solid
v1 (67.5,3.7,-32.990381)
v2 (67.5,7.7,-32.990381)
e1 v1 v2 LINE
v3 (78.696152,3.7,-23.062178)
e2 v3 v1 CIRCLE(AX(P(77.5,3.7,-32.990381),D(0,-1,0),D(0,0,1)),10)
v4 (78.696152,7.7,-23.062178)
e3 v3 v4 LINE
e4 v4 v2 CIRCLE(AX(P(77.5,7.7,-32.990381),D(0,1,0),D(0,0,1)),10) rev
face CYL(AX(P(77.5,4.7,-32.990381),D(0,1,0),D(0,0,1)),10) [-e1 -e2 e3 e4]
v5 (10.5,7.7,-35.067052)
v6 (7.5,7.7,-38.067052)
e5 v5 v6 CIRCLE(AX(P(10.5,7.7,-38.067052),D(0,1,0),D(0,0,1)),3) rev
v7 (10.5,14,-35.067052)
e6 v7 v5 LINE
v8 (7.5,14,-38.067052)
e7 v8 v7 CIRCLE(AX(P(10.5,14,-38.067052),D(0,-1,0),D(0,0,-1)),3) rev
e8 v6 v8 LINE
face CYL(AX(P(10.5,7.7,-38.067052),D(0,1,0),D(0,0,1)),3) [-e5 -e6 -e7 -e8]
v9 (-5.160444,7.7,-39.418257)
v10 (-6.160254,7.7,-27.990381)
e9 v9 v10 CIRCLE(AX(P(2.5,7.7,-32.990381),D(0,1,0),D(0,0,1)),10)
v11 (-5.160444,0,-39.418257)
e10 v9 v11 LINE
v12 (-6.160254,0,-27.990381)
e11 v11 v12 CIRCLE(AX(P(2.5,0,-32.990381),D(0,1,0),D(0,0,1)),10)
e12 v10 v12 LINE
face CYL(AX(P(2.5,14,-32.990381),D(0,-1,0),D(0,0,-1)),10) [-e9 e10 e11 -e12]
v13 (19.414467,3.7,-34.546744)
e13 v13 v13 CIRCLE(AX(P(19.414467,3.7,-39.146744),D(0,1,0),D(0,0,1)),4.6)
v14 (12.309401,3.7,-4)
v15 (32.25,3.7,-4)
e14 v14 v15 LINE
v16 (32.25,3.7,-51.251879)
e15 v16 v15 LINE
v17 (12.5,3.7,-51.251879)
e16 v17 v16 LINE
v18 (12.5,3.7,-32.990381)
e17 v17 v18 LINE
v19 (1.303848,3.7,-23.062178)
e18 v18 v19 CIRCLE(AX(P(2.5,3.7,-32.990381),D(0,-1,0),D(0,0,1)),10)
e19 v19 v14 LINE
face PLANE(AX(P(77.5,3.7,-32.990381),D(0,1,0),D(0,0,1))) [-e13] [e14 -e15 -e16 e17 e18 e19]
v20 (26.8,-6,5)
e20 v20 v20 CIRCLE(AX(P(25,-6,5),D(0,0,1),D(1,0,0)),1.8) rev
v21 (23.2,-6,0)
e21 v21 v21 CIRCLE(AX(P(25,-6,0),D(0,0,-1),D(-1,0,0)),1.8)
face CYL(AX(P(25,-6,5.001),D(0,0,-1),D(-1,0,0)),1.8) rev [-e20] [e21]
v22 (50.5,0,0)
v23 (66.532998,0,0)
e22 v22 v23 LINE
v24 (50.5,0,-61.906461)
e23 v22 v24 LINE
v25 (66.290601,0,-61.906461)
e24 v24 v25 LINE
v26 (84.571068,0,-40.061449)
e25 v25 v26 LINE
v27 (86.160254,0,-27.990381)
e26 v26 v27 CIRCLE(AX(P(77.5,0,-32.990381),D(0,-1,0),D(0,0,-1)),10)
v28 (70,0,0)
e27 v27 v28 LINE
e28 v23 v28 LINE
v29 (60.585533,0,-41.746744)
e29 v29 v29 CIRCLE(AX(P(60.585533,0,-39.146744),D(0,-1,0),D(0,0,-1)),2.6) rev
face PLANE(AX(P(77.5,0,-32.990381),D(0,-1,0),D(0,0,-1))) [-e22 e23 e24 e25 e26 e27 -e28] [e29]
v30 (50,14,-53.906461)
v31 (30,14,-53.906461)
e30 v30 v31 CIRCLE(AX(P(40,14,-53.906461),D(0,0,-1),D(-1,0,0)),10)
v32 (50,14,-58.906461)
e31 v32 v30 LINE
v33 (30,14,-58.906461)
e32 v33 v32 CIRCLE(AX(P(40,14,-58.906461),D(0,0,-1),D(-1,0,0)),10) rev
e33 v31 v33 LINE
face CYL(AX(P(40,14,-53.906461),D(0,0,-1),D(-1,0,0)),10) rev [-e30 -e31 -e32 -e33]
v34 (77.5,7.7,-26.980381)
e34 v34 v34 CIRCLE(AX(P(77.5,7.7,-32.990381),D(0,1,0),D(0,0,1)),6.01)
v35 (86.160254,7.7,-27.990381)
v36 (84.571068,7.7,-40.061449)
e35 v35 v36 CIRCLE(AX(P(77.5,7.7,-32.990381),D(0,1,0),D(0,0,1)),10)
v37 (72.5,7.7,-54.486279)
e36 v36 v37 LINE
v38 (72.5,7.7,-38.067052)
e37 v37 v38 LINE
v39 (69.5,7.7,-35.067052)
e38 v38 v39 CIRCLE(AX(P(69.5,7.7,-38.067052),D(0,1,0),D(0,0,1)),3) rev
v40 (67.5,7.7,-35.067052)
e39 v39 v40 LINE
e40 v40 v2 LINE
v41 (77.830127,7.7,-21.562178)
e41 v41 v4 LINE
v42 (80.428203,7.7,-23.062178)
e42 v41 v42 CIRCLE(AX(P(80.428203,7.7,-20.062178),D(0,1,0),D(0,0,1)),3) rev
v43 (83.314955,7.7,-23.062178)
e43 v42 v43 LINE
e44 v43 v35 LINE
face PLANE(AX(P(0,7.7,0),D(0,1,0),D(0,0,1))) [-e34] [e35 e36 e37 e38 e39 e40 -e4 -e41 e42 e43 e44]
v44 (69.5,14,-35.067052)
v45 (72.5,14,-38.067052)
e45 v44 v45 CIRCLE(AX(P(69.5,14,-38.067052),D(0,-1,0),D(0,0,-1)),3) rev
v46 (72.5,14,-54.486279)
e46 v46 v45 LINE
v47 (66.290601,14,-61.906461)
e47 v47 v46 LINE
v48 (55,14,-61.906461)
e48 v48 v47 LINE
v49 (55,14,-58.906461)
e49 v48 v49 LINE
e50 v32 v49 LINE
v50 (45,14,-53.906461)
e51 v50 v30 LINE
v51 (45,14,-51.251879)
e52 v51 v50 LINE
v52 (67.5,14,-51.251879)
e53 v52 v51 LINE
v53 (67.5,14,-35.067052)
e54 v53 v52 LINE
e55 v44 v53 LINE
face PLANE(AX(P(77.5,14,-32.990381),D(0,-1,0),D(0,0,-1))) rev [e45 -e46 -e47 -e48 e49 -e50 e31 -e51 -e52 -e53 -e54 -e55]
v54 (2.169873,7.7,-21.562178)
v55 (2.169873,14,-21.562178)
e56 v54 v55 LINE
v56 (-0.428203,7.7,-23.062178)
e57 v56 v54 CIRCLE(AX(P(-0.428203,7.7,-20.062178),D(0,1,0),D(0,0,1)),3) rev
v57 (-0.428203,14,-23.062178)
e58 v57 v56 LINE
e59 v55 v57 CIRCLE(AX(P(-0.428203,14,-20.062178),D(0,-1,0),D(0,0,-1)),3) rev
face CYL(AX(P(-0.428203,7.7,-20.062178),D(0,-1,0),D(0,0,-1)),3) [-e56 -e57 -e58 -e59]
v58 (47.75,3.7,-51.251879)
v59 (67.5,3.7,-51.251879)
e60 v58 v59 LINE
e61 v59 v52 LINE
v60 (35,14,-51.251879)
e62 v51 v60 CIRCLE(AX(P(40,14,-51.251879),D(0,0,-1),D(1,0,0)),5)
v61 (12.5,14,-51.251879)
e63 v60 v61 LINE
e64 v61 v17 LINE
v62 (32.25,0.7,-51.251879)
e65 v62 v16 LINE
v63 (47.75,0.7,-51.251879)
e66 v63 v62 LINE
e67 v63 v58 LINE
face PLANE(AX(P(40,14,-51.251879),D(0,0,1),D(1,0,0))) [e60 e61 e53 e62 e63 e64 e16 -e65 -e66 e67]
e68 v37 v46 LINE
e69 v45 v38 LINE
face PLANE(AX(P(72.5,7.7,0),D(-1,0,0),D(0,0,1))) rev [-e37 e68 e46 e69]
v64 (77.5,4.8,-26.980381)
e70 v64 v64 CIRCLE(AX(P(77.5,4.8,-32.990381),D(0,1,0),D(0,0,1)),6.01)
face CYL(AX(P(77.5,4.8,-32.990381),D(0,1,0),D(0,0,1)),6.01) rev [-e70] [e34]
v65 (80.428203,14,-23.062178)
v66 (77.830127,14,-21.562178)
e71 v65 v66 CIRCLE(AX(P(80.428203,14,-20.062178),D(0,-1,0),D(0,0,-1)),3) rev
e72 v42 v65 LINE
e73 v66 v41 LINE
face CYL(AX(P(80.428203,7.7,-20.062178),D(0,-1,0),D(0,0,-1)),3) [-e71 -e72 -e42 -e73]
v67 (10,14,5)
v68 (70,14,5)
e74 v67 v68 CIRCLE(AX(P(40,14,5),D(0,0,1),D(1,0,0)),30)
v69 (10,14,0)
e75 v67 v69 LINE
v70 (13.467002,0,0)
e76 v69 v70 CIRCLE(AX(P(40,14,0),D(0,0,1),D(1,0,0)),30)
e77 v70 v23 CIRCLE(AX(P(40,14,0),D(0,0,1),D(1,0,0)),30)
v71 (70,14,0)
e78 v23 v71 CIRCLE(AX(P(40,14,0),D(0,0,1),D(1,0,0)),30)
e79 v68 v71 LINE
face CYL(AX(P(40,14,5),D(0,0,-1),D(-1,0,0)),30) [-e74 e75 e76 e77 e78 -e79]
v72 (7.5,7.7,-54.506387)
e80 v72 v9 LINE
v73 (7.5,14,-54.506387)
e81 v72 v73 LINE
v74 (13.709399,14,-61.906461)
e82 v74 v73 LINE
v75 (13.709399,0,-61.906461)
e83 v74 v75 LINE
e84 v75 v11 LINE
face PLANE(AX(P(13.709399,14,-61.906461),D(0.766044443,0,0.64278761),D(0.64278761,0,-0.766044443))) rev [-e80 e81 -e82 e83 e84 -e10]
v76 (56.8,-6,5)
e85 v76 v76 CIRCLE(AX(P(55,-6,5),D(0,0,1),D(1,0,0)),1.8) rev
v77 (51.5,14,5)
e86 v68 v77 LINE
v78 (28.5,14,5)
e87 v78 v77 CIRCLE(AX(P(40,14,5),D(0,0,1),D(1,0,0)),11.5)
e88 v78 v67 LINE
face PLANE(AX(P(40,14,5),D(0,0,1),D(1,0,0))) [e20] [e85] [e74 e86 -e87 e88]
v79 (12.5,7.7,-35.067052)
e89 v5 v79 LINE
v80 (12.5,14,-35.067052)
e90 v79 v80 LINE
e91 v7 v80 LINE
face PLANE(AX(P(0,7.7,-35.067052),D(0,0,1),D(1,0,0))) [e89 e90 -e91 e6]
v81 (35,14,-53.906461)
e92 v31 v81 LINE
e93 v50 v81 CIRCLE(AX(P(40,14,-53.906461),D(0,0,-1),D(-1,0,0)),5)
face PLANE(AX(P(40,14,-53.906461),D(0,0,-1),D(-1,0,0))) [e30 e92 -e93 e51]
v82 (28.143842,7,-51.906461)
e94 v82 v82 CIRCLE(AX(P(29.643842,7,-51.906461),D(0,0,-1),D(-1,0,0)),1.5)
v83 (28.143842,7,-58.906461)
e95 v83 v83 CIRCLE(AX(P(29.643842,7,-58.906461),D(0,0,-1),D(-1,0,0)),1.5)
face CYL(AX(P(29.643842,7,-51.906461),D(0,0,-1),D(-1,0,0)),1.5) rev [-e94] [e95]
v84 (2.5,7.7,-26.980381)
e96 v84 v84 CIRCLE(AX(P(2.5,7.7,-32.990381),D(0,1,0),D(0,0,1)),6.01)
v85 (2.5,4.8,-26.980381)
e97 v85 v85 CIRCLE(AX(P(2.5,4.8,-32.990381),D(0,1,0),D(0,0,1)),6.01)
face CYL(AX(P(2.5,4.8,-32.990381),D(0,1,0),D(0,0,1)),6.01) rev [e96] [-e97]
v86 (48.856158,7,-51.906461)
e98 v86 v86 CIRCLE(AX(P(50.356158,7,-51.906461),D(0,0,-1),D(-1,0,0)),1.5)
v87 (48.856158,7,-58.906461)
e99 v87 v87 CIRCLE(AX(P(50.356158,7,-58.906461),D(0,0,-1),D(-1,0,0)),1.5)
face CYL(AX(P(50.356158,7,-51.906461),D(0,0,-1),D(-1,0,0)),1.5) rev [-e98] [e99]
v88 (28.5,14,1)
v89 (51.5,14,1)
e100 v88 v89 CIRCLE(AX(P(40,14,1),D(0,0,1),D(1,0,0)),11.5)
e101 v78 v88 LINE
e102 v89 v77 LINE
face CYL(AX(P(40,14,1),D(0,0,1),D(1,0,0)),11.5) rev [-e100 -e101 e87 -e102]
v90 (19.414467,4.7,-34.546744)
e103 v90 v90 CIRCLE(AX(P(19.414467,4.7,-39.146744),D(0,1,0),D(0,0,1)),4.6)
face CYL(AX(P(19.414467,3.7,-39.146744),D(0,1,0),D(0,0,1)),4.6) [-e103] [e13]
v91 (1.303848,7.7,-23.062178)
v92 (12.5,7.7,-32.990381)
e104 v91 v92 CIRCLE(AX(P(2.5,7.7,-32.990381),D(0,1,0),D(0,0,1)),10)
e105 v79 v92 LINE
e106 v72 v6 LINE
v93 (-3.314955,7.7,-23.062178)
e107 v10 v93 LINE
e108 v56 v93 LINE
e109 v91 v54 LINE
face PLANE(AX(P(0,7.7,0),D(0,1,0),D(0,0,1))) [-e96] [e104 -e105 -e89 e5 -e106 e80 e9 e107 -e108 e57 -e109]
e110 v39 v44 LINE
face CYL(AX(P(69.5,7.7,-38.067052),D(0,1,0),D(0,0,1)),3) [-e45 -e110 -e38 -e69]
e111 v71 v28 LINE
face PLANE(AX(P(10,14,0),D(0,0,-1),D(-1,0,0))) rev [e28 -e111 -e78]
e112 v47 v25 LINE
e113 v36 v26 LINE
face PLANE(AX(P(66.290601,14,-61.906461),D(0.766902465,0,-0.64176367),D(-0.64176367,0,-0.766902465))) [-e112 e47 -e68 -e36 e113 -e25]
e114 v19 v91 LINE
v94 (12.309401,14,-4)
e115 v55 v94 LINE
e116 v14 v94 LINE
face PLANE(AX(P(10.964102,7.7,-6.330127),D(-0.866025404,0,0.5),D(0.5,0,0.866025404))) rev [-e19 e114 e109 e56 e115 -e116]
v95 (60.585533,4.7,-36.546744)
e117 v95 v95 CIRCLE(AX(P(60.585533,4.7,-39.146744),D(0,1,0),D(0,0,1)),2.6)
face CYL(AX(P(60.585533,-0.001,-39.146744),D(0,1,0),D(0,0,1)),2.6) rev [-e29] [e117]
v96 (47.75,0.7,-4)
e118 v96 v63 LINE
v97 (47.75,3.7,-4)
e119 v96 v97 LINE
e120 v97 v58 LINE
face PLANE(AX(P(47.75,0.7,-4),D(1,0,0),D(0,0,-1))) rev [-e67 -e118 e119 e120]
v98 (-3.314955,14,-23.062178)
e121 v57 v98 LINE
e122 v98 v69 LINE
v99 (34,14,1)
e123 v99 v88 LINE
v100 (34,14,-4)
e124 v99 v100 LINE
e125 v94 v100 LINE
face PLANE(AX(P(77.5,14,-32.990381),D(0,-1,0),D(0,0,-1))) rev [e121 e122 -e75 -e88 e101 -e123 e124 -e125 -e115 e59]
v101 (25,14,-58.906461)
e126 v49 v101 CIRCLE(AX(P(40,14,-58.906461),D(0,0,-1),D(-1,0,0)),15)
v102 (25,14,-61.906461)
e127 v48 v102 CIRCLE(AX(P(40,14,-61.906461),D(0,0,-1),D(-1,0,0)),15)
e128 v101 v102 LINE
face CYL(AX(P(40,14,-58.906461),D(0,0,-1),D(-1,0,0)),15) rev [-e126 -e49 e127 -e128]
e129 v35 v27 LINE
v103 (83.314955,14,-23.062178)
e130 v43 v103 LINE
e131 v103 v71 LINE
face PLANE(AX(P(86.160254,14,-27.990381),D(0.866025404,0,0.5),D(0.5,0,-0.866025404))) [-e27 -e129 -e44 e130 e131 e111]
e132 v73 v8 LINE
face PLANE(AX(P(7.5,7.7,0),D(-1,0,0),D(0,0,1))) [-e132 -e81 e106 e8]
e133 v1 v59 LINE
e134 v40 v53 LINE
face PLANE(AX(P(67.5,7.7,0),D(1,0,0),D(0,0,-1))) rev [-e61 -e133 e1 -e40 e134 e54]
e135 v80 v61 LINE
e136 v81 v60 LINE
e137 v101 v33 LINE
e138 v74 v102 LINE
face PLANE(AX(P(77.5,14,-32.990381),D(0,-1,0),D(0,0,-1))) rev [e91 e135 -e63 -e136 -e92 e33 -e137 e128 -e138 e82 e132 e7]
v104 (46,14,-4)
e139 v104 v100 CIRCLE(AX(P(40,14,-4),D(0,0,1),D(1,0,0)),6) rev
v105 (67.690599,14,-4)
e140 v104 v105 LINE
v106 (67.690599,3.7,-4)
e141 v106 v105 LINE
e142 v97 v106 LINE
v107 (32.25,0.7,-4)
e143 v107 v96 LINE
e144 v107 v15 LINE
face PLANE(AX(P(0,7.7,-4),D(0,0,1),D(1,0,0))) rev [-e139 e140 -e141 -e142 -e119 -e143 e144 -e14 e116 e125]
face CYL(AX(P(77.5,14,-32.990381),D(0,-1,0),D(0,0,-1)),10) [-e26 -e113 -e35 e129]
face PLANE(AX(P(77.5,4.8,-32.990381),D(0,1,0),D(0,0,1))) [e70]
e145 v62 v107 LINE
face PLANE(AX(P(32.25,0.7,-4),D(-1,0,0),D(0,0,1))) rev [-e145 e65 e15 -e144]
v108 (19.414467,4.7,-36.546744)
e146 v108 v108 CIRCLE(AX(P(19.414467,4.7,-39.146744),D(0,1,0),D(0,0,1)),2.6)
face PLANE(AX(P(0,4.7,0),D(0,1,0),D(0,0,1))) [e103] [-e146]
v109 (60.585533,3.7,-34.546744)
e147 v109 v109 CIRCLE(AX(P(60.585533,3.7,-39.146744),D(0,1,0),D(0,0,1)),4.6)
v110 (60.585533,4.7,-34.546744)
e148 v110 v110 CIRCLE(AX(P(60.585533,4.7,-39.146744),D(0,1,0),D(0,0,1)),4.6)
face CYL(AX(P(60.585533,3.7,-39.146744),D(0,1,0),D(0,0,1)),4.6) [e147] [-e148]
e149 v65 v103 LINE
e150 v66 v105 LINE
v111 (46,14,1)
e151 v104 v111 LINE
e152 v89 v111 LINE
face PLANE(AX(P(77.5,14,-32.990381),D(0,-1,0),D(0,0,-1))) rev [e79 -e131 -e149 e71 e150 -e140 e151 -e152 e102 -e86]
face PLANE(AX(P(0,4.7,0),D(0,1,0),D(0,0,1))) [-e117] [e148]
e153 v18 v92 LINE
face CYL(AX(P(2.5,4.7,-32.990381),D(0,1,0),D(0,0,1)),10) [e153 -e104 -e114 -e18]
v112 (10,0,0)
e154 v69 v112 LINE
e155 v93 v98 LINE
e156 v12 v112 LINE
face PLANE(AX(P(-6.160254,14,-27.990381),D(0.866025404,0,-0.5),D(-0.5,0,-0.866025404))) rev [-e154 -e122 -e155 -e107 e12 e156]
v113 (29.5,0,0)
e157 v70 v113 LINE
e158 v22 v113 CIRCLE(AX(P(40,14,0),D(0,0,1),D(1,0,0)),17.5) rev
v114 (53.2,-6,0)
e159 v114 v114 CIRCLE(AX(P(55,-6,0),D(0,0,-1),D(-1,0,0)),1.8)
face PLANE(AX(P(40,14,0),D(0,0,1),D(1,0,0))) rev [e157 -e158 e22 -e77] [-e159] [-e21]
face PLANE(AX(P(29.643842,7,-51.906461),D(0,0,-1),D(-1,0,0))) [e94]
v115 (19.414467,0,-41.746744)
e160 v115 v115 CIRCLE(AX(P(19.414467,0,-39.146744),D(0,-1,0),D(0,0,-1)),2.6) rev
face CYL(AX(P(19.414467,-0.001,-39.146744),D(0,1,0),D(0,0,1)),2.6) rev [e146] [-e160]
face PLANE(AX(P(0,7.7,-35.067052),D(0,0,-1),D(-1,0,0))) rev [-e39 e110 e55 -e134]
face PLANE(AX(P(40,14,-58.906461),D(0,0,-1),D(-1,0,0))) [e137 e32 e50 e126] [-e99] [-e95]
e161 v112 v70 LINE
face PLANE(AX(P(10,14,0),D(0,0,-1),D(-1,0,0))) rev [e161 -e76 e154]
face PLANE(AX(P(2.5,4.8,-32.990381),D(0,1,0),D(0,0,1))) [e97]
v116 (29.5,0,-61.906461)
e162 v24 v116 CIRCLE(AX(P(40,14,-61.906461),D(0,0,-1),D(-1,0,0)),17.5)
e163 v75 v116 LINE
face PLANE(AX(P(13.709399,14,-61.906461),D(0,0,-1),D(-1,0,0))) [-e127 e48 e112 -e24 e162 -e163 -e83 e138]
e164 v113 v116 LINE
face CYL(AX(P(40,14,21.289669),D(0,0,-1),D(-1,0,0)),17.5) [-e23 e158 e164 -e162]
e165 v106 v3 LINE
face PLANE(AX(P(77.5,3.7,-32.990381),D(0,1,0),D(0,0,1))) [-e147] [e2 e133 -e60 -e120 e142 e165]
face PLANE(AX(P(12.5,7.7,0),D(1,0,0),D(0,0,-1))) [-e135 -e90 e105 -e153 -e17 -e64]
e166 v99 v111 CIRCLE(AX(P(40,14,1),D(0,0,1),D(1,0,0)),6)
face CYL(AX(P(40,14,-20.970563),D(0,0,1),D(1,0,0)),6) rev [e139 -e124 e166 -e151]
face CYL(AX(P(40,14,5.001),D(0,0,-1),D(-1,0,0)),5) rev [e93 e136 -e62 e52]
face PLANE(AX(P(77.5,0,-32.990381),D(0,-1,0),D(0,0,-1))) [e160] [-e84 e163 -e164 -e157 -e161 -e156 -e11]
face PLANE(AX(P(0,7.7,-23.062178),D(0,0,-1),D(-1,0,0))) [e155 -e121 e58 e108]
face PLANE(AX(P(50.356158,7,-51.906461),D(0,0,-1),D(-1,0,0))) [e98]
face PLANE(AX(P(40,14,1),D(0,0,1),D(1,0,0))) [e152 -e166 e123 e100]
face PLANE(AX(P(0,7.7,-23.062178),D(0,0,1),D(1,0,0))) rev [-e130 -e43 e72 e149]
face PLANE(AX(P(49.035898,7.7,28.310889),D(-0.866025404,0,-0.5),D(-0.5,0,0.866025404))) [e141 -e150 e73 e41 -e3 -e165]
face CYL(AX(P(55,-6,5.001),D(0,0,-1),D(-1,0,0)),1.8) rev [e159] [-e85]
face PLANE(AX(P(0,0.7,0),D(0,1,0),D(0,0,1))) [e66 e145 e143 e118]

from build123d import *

# Parameters (mm, degrees)
EXTRUDE_1_DEPTH      = 14
CUT_EXTRUDE_START    = -6.3
CUT_EXTRUDE_1_DEPTH  = 6.3
CUT_EXTRUDE_START_2  = -3
CUT_EXTRUDE_2_DEPTH  = 3
SKETCH_4_R           = 6.01
CUT_EXTRUDE_3_DEPTH  = 2.9
CUT_EXTRUDE_4_REACH  = 109.588
SKETCH_5_R           = 2.6
CUT_EXTRUDE_START_3  = -1
SKETCH_6_R           = 4.6
CUT_EXTRUDE_6_DEPTH  = 1
EXTRUDE_2_DEPTH      = 5
SKETCH_8_R           = 11.5
CUT_EXTRUDE_7_DEPTH  = 4
CUT_EXTRUDE_8_REACH  = 110.373
SKETCH_9_R           = 1.8
FILLET_1_R           = 3
SKETCH_12_R          = 10
CUT_EXTRUDE_10_DEPTH = 8
EXTRUDE_3_DEPTH      = 61.90646084
SKETCH_19_R          = 6
CUT_EXTRUDE_14_DEPTH = 9
CUT_EXTRUDE_11_REACH = 108.687
SKETCH_13_R          = 5
SKETCH_21_R          = 15
CUT_EXTRUDE_15_DEPTH = 3
SKETCH_23_R          = 1.5
CUT_EXTRUDE_16_DEPTH = 7
CUT_EXTRUDE_START_4  = -5
CUT_EXTRUDE_19_DEPTH = 5
SKETCH_34_W          = 15.5
SKETCH_34_H          = 47.251878887
CUT_EXTRUDE_20_DEPTH = 3


with BuildPart() as part:
    # 草图1 → 凸台-拉伸1 (new body)
    with BuildSketch(Plane(origin=(0, 0, 0), x_dir=(1, 0, 0), z_dir=(0, 1, 0))):
        with BuildLine():
            Line((13.709398988, 61.90646084), (-5.160444431, 39.418257154))
            ThreePointArc((-5.160444431, 39.418257154), (-7.461946981, 33.861938484), (-6.160254038, 27.990381057))
            Line((-6.160254038, 27.990381057), (10, 0))
            Line((10, 0), (70, 0))
            Line((70, 0), (86.160254038, 27.990381057))
            ThreePointArc((86.160254038, 27.990381057), (87.414448614, 34.295642979), (84.571067812, 40.061448869))
            Line((84.571067812, 40.061448869), (66.290601012, 61.90646084))
            Line((66.290601012, 61.90646084), (13.709398988, 61.90646084))
        make_face()
    extrude(amount=EXTRUDE_1_DEPTH)

    # 草图2 → 切除-拉伸1 (cut)
    with BuildSketch(Plane(origin=(0, 14, 0), x_dir=(1, 0, 0), z_dir=(0, 1, 0)).offset(CUT_EXTRUDE_START)):
        with BuildLine():
            Line((-3.314954576, 23.062177826), (1.303847577, 23.062177826))
            Line((1.303847577, 23.062177826), (12.309401077, 4))
            Line((12.309401077, 4), (67.690598923, 4))
            Line((67.690598923, 4), (78.696152423, 23.062177826))
            Line((78.696152423, 23.062177826), (83.314954576, 23.062177826))
            Line((83.314954576, 23.062177826), (86.160254038, 27.990381057))
            ThreePointArc((86.160254038, 27.990381057), (87.461946981, 33.861938484), (85.160444431, 39.418257154))
            ThreePointArc((85.160444431, 39.418257154), (84.872773368, 39.746283133), (84.571067812, 40.061448869))
            Line((84.571067812, 40.061448869), (73.343672408, 53.478096796))
            Line((73.343672408, 53.478096796), (72.5, 54.486278592))
            Line((72.5, 54.486278592), (72.5, 35.067052168))
            Line((72.5, 35.067052168), (67.5, 35.067052168))
            Line((67.5, 35.067052168), (67.5, 46.251878887))
            Line((67.5, 46.251878887), (12.5, 46.251878887))
            Line((12.5, 46.251878887), (12.5, 35.067052168))
            Line((12.5, 35.067052168), (7.5, 35.067052168))
            Line((7.5, 35.067052168), (7.5, 54.506387288))
            Line((7.5, 54.506387288), (-5.160444431, 39.418257154))
            ThreePointArc((-5.160444431, 39.418257154), (-7.461946981, 33.861938484), (-6.160254038, 27.990381057))
            Line((-6.160254038, 27.990381057), (-3.314954576, 23.062177826))
        make_face()
    extrude(amount=CUT_EXTRUDE_1_DEPTH, mode=Mode.SUBTRACT)

    # 草图3 → 切除-拉伸2 (cut)
    with BuildSketch(Plane(origin=(0, 7.7, 0), x_dir=(1, 0, 0), z_dir=(0, 1, 0)).offset(CUT_EXTRUDE_START_2)):
        with BuildLine():
            Line((67.690598923, 4), (78.696152423, 23.062177826))
            ThreePointArc((78.696152423, 23.062177826), (70.865300468, 25.508351779), (67.5, 32.990381057))
            Line((67.5, 32.990381057), (67.5, 35.067052168))
            Line((67.5, 35.067052168), (67.5, 46.251878887))
            Line((67.5, 46.251878887), (12.5, 46.251878887))
            Line((12.5, 46.251878887), (12.5, 35.067052168))
            Line((12.5, 35.067052168), (12.5, 32.990381057))
            ThreePointArc((12.5, 32.990381057), (9.134699532, 25.508351779), (1.303847577, 23.062177826))
            Line((1.303847577, 23.062177826), (12.309401077, 4))
            Line((12.309401077, 4), (67.690598923, 4))
        make_face()
    extrude(amount=CUT_EXTRUDE_2_DEPTH, mode=Mode.SUBTRACT)

    # 草图4 → 切除-拉伸3 (cut)
    with BuildSketch(Plane(origin=(0, 7.7, 0), x_dir=(1, 0, 0), z_dir=(0, 1, 0))):
        with Locations(Location((2.5, 32.990381057, 0), (0, 0, 270))):
            Circle(SKETCH_4_R)
        with Locations(Location((77.5, 32.990381057, 0), (0, 0, 270))):
            Circle(SKETCH_4_R)
    extrude(amount=-CUT_EXTRUDE_3_DEPTH, mode=Mode.SUBTRACT)

    # 草图5 → 切除-拉伸4 (cut, up to next)
    with BuildSketch(Plane(origin=(0, 4.7, 0), x_dir=(1, 0, 0), z_dir=(0, 1, 0)), mode=Mode.PRIVATE) as cut_extrude_4_sk1:
        with Locations(Location((19.414467174, 39.146743637, 0), (0, 0, 270))):
            Circle(SKETCH_5_R)
    cut_extrude_4_tool1 = extrude(cut_extrude_4_sk1.sketch, amount=-CUT_EXTRUDE_4_REACH, mode=Mode.PRIVATE) & part.part
    # 草图5 → 切除-拉伸4 (cut, up to next)
    with BuildSketch(Plane(origin=(0, 4.7, 0), x_dir=(1, 0, 0), z_dir=(0, 1, 0)), mode=Mode.PRIVATE) as cut_extrude_4_sk2:
        with Locations(Location((60.585532826, 39.146743637, 0), (0, 0, 270))):
            Circle(SKETCH_5_R)
    cut_extrude_4_tool2 = extrude(cut_extrude_4_sk2.sketch, amount=-CUT_EXTRUDE_4_REACH, mode=Mode.PRIVATE) & part.part
    add(cut_extrude_4_tool1.solids().sort_by_distance((19.414467, 4.7, -39.146744))[0], mode=Mode.SUBTRACT)
    add(cut_extrude_4_tool2.solids().sort_by_distance((60.585533, 4.7, -39.146744))[0], mode=Mode.SUBTRACT)

    # 草图6 → 切除-拉伸6 (cut)
    with BuildSketch(Plane(origin=(0, 4.7, 0), x_dir=(1, 0, 0), z_dir=(0, 1, 0)).offset(CUT_EXTRUDE_START_3)):
        with BuildLine():
            Line((67.690598923, 4), (78.696152423, 23.062177826))
            ThreePointArc((78.696152423, 23.062177826), (70.865300468, 25.508351779), (67.5, 32.990381057))
            Line((67.5, 32.990381057), (67.5, 46.251878887))
            Line((67.5, 46.251878887), (12.5, 46.251878887))
            Line((12.5, 46.251878887), (12.5, 32.990381057))
            ThreePointArc((12.5, 32.990381057), (9.134699532, 25.508351779), (1.303847577, 23.062177826))
            Line((1.303847577, 23.062177826), (12.309401077, 4))
            Line((12.309401077, 4), (67.690598923, 4))
        make_face()
        with Locations(Location((19.414467174, 39.146743637, 0), (0, 0, 270))):
            Circle(SKETCH_6_R, mode=Mode.SUBTRACT)
        with Locations(Location((60.585532826, 39.146743637, 0), (0, 0, 270))):
            Circle(SKETCH_6_R, mode=Mode.SUBTRACT)
    extrude(amount=CUT_EXTRUDE_6_DEPTH, mode=Mode.SUBTRACT)

    # 草图7 → 凸台-拉伸2 (add)
    with BuildSketch(Plane.XY):
        with BuildLine():
            Line((10, 14), (70, 14))
            ThreePointArc((70, 14), (40, -16), (10, 14))
        make_face()
    extrude(amount=EXTRUDE_2_DEPTH)

    # 草图8 → 切除-拉伸7 (cut)
    with BuildSketch(Plane.XY.offset(5)):
        with Locations((40, 14)):
            Circle(SKETCH_8_R)
    extrude(amount=-CUT_EXTRUDE_7_DEPTH, mode=Mode.SUBTRACT)

    # 草图9 → 切除-拉伸8 (cut, up to next)
    with BuildSketch(Plane(origin=(0, 0, 0), x_dir=(-1, 0, 0), z_dir=(0, 0, -1)), mode=Mode.PRIVATE) as cut_extrude_8_sk1:
        with Locations((-55, -6)):
            Circle(SKETCH_9_R)
    cut_extrude_8_tool1 = extrude(cut_extrude_8_sk1.sketch, amount=-CUT_EXTRUDE_8_REACH, mode=Mode.PRIVATE) & part.part
    # 草图9 → 切除-拉伸8 (cut, up to next)
    with BuildSketch(Plane(origin=(0, 0, 0), x_dir=(-1, 0, 0), z_dir=(0, 0, -1)), mode=Mode.PRIVATE) as cut_extrude_8_sk2:
        with Locations((-25, -6)):
            Circle(SKETCH_9_R)
    cut_extrude_8_tool2 = extrude(cut_extrude_8_sk2.sketch, amount=-CUT_EXTRUDE_8_REACH, mode=Mode.PRIVATE) & part.part
    add(cut_extrude_8_tool1.solids().sort_by_distance((55, -6, 0))[0], mode=Mode.SUBTRACT)
    add(cut_extrude_8_tool2.solids().sort_by_distance((25, -6, 0))[0], mode=Mode.SUBTRACT)

    # 圆角1
    # the kernel refuses this fillet: 3 mm, written as the material it takes off along each edge
    with BuildSketch(Plane(origin=(78.696152423, 7.7, -23.062177826), x_dir=(1, 0, 0), z_dir=(0, 1, 0))) as fillet_1_piece_1:
        with BuildLine():
            CenterArc((FILLET_1_R * 0.57735026919, -FILLET_1_R), FILLET_1_R, 90, 60)
            Line((-FILLET_1_R * 0.288675134595, -FILLET_1_R * 0.5), (0, 0))
            Line((0, 0), (FILLET_1_R * 0.57735026919, 0))
        make_face()
    extrude(amount=10.630127019, mode=Mode.SUBTRACT)
    with BuildSketch(Plane(origin=(1.303847577, 7.7, -23.062177826), x_dir=(-1, 0, 0), z_dir=(0, 1, 0))) as fillet_1_piece_2:
        with BuildLine():
            CenterArc((FILLET_1_R * 0.57735026919, FILLET_1_R), FILLET_1_R, 210, 60)
            Line((-FILLET_1_R * 0.288675134595, FILLET_1_R * 0.5), (0, 0))
            Line((0, 0), (FILLET_1_R * 0.57735026919, 0))
        make_face()
    extrude(amount=10.630127019, mode=Mode.SUBTRACT)
    with BuildSketch(Plane(origin=(7.5, 7.7, -35.067052168), x_dir=(0, 0, -1), z_dir=(0, 1, 0))) as fillet_1_piece_3:
        with BuildLine():
            CenterArc((FILLET_1_R, -FILLET_1_R), FILLET_1_R, 90, 90)
            Line((0, -FILLET_1_R), (0, 0))
            Line((0, 0), (FILLET_1_R, 0))
        make_face()
    extrude(amount=13.8, mode=Mode.SUBTRACT)
    with BuildSketch(Plane(origin=(72.5, 7.7, -35.067052168), x_dir=(0, 0, -1), z_dir=(0, 1, 0))) as fillet_1_piece_4:
        with BuildLine():
            CenterArc((FILLET_1_R, FILLET_1_R), FILLET_1_R, 180, 90)
            Line((0, FILLET_1_R), (0, 0))
            Line((0, 0), (FILLET_1_R, 0))
        make_face()
    extrude(amount=13.8, mode=Mode.SUBTRACT)

    # 草图12 → 切除-拉伸10 (cut)
    with BuildSketch(Plane(origin=(0, 0, -61.90646084), x_dir=(-1, 0, 0), z_dir=(0, 0, -1))):
        with Locations((-40, 14)):
            Circle(SKETCH_12_R)
    extrude(amount=-CUT_EXTRUDE_10_DEPTH, mode=Mode.SUBTRACT)

    # 草图16 → 凸台-拉伸3 (add)
    with BuildSketch(Plane(origin=(0, 0, -61.90646084), x_dir=(-1, 0, 0), z_dir=(0, 0, -1))):
        with BuildLine():
            ThreePointArc((-50.5, 0), (-40, -3.5), (-29.5, 0))
            Line((-29.5, 0), (-50.5, 0))
        make_face()
    extrude(amount=-EXTRUDE_3_DEPTH)

    # 草图19 → 切除-拉伸14 (cut)
    with BuildSketch(Plane.XY.offset(5)):
        with Locations((40, 14)):
            Circle(SKETCH_19_R)
    extrude(amount=-CUT_EXTRUDE_14_DEPTH, mode=Mode.SUBTRACT)

    # 草图13 → 切除-拉伸11 (cut, up to next)
    with BuildSketch(Plane(origin=(0, 0, -53.90646084), x_dir=(-1, 0, 0), z_dir=(0, 0, -1)), mode=Mode.PRIVATE) as cut_extrude_11_sk1:
        with Locations((-40, 14)):
            Circle(SKETCH_13_R)
    cut_extrude_11_tool1 = extrude(cut_extrude_11_sk1.sketch, amount=-CUT_EXTRUDE_11_REACH, mode=Mode.PRIVATE) & part.part
    add(cut_extrude_11_tool1.solids().sort_by_distance((40, 14, -53.906461))[0], mode=Mode.SUBTRACT)

    # 草图21 → 切除-拉伸15 (cut)
    with BuildSketch(Plane(origin=(0, 0, -61.90646084), x_dir=(-1, 0, 0), z_dir=(0, 0, -1))):
        with Locations((-40, 14)):
            Circle(SKETCH_21_R)
    extrude(amount=-CUT_EXTRUDE_15_DEPTH, mode=Mode.SUBTRACT)

    # 草图23 → 切除-拉伸16 (cut)
    with BuildSketch(Plane(origin=(0, 0, -58.90646084), x_dir=(-1, 0, 0), z_dir=(0, 0, -1))):
        with Locations((-50.356157589, 7)):
            Circle(SKETCH_23_R)
        with Locations((-29.643842411, 7)):
            Circle(SKETCH_23_R)
    extrude(amount=-CUT_EXTRUDE_16_DEPTH, mode=Mode.SUBTRACT)

    # 草图33 → 切除-拉伸19 (cut)
    with BuildSketch(Plane.XY.offset(-46.251878887).offset(CUT_EXTRUDE_START_4)):
        with BuildLine():
            Line((35, 14), (12.5, 14))
            Line((12.5, 14), (12.5, 3.7))
            Line((12.5, 3.7), (67.5, 3.7))
            Line((67.5, 3.7), (67.5, 14))
            Line((67.5, 14), (45, 14))
            ThreePointArc((45, 14), (40, 9), (35, 14))
        make_face()
    extrude(amount=CUT_EXTRUDE_19_DEPTH, mode=Mode.SUBTRACT)

    # 草图34 → 切除-拉伸20 (cut)
    with BuildSketch(Plane(origin=(0, 3.7, 0), x_dir=(1, 0, 0), z_dir=(0, 1, 0))):
        with Locations((40, 27.625939444)):
            Rectangle(SKETCH_34_W, SKETCH_34_H)
    extrude(amount=-CUT_EXTRUDE_20_DEPTH, mode=Mode.SUBTRACT)


solid = part.part
